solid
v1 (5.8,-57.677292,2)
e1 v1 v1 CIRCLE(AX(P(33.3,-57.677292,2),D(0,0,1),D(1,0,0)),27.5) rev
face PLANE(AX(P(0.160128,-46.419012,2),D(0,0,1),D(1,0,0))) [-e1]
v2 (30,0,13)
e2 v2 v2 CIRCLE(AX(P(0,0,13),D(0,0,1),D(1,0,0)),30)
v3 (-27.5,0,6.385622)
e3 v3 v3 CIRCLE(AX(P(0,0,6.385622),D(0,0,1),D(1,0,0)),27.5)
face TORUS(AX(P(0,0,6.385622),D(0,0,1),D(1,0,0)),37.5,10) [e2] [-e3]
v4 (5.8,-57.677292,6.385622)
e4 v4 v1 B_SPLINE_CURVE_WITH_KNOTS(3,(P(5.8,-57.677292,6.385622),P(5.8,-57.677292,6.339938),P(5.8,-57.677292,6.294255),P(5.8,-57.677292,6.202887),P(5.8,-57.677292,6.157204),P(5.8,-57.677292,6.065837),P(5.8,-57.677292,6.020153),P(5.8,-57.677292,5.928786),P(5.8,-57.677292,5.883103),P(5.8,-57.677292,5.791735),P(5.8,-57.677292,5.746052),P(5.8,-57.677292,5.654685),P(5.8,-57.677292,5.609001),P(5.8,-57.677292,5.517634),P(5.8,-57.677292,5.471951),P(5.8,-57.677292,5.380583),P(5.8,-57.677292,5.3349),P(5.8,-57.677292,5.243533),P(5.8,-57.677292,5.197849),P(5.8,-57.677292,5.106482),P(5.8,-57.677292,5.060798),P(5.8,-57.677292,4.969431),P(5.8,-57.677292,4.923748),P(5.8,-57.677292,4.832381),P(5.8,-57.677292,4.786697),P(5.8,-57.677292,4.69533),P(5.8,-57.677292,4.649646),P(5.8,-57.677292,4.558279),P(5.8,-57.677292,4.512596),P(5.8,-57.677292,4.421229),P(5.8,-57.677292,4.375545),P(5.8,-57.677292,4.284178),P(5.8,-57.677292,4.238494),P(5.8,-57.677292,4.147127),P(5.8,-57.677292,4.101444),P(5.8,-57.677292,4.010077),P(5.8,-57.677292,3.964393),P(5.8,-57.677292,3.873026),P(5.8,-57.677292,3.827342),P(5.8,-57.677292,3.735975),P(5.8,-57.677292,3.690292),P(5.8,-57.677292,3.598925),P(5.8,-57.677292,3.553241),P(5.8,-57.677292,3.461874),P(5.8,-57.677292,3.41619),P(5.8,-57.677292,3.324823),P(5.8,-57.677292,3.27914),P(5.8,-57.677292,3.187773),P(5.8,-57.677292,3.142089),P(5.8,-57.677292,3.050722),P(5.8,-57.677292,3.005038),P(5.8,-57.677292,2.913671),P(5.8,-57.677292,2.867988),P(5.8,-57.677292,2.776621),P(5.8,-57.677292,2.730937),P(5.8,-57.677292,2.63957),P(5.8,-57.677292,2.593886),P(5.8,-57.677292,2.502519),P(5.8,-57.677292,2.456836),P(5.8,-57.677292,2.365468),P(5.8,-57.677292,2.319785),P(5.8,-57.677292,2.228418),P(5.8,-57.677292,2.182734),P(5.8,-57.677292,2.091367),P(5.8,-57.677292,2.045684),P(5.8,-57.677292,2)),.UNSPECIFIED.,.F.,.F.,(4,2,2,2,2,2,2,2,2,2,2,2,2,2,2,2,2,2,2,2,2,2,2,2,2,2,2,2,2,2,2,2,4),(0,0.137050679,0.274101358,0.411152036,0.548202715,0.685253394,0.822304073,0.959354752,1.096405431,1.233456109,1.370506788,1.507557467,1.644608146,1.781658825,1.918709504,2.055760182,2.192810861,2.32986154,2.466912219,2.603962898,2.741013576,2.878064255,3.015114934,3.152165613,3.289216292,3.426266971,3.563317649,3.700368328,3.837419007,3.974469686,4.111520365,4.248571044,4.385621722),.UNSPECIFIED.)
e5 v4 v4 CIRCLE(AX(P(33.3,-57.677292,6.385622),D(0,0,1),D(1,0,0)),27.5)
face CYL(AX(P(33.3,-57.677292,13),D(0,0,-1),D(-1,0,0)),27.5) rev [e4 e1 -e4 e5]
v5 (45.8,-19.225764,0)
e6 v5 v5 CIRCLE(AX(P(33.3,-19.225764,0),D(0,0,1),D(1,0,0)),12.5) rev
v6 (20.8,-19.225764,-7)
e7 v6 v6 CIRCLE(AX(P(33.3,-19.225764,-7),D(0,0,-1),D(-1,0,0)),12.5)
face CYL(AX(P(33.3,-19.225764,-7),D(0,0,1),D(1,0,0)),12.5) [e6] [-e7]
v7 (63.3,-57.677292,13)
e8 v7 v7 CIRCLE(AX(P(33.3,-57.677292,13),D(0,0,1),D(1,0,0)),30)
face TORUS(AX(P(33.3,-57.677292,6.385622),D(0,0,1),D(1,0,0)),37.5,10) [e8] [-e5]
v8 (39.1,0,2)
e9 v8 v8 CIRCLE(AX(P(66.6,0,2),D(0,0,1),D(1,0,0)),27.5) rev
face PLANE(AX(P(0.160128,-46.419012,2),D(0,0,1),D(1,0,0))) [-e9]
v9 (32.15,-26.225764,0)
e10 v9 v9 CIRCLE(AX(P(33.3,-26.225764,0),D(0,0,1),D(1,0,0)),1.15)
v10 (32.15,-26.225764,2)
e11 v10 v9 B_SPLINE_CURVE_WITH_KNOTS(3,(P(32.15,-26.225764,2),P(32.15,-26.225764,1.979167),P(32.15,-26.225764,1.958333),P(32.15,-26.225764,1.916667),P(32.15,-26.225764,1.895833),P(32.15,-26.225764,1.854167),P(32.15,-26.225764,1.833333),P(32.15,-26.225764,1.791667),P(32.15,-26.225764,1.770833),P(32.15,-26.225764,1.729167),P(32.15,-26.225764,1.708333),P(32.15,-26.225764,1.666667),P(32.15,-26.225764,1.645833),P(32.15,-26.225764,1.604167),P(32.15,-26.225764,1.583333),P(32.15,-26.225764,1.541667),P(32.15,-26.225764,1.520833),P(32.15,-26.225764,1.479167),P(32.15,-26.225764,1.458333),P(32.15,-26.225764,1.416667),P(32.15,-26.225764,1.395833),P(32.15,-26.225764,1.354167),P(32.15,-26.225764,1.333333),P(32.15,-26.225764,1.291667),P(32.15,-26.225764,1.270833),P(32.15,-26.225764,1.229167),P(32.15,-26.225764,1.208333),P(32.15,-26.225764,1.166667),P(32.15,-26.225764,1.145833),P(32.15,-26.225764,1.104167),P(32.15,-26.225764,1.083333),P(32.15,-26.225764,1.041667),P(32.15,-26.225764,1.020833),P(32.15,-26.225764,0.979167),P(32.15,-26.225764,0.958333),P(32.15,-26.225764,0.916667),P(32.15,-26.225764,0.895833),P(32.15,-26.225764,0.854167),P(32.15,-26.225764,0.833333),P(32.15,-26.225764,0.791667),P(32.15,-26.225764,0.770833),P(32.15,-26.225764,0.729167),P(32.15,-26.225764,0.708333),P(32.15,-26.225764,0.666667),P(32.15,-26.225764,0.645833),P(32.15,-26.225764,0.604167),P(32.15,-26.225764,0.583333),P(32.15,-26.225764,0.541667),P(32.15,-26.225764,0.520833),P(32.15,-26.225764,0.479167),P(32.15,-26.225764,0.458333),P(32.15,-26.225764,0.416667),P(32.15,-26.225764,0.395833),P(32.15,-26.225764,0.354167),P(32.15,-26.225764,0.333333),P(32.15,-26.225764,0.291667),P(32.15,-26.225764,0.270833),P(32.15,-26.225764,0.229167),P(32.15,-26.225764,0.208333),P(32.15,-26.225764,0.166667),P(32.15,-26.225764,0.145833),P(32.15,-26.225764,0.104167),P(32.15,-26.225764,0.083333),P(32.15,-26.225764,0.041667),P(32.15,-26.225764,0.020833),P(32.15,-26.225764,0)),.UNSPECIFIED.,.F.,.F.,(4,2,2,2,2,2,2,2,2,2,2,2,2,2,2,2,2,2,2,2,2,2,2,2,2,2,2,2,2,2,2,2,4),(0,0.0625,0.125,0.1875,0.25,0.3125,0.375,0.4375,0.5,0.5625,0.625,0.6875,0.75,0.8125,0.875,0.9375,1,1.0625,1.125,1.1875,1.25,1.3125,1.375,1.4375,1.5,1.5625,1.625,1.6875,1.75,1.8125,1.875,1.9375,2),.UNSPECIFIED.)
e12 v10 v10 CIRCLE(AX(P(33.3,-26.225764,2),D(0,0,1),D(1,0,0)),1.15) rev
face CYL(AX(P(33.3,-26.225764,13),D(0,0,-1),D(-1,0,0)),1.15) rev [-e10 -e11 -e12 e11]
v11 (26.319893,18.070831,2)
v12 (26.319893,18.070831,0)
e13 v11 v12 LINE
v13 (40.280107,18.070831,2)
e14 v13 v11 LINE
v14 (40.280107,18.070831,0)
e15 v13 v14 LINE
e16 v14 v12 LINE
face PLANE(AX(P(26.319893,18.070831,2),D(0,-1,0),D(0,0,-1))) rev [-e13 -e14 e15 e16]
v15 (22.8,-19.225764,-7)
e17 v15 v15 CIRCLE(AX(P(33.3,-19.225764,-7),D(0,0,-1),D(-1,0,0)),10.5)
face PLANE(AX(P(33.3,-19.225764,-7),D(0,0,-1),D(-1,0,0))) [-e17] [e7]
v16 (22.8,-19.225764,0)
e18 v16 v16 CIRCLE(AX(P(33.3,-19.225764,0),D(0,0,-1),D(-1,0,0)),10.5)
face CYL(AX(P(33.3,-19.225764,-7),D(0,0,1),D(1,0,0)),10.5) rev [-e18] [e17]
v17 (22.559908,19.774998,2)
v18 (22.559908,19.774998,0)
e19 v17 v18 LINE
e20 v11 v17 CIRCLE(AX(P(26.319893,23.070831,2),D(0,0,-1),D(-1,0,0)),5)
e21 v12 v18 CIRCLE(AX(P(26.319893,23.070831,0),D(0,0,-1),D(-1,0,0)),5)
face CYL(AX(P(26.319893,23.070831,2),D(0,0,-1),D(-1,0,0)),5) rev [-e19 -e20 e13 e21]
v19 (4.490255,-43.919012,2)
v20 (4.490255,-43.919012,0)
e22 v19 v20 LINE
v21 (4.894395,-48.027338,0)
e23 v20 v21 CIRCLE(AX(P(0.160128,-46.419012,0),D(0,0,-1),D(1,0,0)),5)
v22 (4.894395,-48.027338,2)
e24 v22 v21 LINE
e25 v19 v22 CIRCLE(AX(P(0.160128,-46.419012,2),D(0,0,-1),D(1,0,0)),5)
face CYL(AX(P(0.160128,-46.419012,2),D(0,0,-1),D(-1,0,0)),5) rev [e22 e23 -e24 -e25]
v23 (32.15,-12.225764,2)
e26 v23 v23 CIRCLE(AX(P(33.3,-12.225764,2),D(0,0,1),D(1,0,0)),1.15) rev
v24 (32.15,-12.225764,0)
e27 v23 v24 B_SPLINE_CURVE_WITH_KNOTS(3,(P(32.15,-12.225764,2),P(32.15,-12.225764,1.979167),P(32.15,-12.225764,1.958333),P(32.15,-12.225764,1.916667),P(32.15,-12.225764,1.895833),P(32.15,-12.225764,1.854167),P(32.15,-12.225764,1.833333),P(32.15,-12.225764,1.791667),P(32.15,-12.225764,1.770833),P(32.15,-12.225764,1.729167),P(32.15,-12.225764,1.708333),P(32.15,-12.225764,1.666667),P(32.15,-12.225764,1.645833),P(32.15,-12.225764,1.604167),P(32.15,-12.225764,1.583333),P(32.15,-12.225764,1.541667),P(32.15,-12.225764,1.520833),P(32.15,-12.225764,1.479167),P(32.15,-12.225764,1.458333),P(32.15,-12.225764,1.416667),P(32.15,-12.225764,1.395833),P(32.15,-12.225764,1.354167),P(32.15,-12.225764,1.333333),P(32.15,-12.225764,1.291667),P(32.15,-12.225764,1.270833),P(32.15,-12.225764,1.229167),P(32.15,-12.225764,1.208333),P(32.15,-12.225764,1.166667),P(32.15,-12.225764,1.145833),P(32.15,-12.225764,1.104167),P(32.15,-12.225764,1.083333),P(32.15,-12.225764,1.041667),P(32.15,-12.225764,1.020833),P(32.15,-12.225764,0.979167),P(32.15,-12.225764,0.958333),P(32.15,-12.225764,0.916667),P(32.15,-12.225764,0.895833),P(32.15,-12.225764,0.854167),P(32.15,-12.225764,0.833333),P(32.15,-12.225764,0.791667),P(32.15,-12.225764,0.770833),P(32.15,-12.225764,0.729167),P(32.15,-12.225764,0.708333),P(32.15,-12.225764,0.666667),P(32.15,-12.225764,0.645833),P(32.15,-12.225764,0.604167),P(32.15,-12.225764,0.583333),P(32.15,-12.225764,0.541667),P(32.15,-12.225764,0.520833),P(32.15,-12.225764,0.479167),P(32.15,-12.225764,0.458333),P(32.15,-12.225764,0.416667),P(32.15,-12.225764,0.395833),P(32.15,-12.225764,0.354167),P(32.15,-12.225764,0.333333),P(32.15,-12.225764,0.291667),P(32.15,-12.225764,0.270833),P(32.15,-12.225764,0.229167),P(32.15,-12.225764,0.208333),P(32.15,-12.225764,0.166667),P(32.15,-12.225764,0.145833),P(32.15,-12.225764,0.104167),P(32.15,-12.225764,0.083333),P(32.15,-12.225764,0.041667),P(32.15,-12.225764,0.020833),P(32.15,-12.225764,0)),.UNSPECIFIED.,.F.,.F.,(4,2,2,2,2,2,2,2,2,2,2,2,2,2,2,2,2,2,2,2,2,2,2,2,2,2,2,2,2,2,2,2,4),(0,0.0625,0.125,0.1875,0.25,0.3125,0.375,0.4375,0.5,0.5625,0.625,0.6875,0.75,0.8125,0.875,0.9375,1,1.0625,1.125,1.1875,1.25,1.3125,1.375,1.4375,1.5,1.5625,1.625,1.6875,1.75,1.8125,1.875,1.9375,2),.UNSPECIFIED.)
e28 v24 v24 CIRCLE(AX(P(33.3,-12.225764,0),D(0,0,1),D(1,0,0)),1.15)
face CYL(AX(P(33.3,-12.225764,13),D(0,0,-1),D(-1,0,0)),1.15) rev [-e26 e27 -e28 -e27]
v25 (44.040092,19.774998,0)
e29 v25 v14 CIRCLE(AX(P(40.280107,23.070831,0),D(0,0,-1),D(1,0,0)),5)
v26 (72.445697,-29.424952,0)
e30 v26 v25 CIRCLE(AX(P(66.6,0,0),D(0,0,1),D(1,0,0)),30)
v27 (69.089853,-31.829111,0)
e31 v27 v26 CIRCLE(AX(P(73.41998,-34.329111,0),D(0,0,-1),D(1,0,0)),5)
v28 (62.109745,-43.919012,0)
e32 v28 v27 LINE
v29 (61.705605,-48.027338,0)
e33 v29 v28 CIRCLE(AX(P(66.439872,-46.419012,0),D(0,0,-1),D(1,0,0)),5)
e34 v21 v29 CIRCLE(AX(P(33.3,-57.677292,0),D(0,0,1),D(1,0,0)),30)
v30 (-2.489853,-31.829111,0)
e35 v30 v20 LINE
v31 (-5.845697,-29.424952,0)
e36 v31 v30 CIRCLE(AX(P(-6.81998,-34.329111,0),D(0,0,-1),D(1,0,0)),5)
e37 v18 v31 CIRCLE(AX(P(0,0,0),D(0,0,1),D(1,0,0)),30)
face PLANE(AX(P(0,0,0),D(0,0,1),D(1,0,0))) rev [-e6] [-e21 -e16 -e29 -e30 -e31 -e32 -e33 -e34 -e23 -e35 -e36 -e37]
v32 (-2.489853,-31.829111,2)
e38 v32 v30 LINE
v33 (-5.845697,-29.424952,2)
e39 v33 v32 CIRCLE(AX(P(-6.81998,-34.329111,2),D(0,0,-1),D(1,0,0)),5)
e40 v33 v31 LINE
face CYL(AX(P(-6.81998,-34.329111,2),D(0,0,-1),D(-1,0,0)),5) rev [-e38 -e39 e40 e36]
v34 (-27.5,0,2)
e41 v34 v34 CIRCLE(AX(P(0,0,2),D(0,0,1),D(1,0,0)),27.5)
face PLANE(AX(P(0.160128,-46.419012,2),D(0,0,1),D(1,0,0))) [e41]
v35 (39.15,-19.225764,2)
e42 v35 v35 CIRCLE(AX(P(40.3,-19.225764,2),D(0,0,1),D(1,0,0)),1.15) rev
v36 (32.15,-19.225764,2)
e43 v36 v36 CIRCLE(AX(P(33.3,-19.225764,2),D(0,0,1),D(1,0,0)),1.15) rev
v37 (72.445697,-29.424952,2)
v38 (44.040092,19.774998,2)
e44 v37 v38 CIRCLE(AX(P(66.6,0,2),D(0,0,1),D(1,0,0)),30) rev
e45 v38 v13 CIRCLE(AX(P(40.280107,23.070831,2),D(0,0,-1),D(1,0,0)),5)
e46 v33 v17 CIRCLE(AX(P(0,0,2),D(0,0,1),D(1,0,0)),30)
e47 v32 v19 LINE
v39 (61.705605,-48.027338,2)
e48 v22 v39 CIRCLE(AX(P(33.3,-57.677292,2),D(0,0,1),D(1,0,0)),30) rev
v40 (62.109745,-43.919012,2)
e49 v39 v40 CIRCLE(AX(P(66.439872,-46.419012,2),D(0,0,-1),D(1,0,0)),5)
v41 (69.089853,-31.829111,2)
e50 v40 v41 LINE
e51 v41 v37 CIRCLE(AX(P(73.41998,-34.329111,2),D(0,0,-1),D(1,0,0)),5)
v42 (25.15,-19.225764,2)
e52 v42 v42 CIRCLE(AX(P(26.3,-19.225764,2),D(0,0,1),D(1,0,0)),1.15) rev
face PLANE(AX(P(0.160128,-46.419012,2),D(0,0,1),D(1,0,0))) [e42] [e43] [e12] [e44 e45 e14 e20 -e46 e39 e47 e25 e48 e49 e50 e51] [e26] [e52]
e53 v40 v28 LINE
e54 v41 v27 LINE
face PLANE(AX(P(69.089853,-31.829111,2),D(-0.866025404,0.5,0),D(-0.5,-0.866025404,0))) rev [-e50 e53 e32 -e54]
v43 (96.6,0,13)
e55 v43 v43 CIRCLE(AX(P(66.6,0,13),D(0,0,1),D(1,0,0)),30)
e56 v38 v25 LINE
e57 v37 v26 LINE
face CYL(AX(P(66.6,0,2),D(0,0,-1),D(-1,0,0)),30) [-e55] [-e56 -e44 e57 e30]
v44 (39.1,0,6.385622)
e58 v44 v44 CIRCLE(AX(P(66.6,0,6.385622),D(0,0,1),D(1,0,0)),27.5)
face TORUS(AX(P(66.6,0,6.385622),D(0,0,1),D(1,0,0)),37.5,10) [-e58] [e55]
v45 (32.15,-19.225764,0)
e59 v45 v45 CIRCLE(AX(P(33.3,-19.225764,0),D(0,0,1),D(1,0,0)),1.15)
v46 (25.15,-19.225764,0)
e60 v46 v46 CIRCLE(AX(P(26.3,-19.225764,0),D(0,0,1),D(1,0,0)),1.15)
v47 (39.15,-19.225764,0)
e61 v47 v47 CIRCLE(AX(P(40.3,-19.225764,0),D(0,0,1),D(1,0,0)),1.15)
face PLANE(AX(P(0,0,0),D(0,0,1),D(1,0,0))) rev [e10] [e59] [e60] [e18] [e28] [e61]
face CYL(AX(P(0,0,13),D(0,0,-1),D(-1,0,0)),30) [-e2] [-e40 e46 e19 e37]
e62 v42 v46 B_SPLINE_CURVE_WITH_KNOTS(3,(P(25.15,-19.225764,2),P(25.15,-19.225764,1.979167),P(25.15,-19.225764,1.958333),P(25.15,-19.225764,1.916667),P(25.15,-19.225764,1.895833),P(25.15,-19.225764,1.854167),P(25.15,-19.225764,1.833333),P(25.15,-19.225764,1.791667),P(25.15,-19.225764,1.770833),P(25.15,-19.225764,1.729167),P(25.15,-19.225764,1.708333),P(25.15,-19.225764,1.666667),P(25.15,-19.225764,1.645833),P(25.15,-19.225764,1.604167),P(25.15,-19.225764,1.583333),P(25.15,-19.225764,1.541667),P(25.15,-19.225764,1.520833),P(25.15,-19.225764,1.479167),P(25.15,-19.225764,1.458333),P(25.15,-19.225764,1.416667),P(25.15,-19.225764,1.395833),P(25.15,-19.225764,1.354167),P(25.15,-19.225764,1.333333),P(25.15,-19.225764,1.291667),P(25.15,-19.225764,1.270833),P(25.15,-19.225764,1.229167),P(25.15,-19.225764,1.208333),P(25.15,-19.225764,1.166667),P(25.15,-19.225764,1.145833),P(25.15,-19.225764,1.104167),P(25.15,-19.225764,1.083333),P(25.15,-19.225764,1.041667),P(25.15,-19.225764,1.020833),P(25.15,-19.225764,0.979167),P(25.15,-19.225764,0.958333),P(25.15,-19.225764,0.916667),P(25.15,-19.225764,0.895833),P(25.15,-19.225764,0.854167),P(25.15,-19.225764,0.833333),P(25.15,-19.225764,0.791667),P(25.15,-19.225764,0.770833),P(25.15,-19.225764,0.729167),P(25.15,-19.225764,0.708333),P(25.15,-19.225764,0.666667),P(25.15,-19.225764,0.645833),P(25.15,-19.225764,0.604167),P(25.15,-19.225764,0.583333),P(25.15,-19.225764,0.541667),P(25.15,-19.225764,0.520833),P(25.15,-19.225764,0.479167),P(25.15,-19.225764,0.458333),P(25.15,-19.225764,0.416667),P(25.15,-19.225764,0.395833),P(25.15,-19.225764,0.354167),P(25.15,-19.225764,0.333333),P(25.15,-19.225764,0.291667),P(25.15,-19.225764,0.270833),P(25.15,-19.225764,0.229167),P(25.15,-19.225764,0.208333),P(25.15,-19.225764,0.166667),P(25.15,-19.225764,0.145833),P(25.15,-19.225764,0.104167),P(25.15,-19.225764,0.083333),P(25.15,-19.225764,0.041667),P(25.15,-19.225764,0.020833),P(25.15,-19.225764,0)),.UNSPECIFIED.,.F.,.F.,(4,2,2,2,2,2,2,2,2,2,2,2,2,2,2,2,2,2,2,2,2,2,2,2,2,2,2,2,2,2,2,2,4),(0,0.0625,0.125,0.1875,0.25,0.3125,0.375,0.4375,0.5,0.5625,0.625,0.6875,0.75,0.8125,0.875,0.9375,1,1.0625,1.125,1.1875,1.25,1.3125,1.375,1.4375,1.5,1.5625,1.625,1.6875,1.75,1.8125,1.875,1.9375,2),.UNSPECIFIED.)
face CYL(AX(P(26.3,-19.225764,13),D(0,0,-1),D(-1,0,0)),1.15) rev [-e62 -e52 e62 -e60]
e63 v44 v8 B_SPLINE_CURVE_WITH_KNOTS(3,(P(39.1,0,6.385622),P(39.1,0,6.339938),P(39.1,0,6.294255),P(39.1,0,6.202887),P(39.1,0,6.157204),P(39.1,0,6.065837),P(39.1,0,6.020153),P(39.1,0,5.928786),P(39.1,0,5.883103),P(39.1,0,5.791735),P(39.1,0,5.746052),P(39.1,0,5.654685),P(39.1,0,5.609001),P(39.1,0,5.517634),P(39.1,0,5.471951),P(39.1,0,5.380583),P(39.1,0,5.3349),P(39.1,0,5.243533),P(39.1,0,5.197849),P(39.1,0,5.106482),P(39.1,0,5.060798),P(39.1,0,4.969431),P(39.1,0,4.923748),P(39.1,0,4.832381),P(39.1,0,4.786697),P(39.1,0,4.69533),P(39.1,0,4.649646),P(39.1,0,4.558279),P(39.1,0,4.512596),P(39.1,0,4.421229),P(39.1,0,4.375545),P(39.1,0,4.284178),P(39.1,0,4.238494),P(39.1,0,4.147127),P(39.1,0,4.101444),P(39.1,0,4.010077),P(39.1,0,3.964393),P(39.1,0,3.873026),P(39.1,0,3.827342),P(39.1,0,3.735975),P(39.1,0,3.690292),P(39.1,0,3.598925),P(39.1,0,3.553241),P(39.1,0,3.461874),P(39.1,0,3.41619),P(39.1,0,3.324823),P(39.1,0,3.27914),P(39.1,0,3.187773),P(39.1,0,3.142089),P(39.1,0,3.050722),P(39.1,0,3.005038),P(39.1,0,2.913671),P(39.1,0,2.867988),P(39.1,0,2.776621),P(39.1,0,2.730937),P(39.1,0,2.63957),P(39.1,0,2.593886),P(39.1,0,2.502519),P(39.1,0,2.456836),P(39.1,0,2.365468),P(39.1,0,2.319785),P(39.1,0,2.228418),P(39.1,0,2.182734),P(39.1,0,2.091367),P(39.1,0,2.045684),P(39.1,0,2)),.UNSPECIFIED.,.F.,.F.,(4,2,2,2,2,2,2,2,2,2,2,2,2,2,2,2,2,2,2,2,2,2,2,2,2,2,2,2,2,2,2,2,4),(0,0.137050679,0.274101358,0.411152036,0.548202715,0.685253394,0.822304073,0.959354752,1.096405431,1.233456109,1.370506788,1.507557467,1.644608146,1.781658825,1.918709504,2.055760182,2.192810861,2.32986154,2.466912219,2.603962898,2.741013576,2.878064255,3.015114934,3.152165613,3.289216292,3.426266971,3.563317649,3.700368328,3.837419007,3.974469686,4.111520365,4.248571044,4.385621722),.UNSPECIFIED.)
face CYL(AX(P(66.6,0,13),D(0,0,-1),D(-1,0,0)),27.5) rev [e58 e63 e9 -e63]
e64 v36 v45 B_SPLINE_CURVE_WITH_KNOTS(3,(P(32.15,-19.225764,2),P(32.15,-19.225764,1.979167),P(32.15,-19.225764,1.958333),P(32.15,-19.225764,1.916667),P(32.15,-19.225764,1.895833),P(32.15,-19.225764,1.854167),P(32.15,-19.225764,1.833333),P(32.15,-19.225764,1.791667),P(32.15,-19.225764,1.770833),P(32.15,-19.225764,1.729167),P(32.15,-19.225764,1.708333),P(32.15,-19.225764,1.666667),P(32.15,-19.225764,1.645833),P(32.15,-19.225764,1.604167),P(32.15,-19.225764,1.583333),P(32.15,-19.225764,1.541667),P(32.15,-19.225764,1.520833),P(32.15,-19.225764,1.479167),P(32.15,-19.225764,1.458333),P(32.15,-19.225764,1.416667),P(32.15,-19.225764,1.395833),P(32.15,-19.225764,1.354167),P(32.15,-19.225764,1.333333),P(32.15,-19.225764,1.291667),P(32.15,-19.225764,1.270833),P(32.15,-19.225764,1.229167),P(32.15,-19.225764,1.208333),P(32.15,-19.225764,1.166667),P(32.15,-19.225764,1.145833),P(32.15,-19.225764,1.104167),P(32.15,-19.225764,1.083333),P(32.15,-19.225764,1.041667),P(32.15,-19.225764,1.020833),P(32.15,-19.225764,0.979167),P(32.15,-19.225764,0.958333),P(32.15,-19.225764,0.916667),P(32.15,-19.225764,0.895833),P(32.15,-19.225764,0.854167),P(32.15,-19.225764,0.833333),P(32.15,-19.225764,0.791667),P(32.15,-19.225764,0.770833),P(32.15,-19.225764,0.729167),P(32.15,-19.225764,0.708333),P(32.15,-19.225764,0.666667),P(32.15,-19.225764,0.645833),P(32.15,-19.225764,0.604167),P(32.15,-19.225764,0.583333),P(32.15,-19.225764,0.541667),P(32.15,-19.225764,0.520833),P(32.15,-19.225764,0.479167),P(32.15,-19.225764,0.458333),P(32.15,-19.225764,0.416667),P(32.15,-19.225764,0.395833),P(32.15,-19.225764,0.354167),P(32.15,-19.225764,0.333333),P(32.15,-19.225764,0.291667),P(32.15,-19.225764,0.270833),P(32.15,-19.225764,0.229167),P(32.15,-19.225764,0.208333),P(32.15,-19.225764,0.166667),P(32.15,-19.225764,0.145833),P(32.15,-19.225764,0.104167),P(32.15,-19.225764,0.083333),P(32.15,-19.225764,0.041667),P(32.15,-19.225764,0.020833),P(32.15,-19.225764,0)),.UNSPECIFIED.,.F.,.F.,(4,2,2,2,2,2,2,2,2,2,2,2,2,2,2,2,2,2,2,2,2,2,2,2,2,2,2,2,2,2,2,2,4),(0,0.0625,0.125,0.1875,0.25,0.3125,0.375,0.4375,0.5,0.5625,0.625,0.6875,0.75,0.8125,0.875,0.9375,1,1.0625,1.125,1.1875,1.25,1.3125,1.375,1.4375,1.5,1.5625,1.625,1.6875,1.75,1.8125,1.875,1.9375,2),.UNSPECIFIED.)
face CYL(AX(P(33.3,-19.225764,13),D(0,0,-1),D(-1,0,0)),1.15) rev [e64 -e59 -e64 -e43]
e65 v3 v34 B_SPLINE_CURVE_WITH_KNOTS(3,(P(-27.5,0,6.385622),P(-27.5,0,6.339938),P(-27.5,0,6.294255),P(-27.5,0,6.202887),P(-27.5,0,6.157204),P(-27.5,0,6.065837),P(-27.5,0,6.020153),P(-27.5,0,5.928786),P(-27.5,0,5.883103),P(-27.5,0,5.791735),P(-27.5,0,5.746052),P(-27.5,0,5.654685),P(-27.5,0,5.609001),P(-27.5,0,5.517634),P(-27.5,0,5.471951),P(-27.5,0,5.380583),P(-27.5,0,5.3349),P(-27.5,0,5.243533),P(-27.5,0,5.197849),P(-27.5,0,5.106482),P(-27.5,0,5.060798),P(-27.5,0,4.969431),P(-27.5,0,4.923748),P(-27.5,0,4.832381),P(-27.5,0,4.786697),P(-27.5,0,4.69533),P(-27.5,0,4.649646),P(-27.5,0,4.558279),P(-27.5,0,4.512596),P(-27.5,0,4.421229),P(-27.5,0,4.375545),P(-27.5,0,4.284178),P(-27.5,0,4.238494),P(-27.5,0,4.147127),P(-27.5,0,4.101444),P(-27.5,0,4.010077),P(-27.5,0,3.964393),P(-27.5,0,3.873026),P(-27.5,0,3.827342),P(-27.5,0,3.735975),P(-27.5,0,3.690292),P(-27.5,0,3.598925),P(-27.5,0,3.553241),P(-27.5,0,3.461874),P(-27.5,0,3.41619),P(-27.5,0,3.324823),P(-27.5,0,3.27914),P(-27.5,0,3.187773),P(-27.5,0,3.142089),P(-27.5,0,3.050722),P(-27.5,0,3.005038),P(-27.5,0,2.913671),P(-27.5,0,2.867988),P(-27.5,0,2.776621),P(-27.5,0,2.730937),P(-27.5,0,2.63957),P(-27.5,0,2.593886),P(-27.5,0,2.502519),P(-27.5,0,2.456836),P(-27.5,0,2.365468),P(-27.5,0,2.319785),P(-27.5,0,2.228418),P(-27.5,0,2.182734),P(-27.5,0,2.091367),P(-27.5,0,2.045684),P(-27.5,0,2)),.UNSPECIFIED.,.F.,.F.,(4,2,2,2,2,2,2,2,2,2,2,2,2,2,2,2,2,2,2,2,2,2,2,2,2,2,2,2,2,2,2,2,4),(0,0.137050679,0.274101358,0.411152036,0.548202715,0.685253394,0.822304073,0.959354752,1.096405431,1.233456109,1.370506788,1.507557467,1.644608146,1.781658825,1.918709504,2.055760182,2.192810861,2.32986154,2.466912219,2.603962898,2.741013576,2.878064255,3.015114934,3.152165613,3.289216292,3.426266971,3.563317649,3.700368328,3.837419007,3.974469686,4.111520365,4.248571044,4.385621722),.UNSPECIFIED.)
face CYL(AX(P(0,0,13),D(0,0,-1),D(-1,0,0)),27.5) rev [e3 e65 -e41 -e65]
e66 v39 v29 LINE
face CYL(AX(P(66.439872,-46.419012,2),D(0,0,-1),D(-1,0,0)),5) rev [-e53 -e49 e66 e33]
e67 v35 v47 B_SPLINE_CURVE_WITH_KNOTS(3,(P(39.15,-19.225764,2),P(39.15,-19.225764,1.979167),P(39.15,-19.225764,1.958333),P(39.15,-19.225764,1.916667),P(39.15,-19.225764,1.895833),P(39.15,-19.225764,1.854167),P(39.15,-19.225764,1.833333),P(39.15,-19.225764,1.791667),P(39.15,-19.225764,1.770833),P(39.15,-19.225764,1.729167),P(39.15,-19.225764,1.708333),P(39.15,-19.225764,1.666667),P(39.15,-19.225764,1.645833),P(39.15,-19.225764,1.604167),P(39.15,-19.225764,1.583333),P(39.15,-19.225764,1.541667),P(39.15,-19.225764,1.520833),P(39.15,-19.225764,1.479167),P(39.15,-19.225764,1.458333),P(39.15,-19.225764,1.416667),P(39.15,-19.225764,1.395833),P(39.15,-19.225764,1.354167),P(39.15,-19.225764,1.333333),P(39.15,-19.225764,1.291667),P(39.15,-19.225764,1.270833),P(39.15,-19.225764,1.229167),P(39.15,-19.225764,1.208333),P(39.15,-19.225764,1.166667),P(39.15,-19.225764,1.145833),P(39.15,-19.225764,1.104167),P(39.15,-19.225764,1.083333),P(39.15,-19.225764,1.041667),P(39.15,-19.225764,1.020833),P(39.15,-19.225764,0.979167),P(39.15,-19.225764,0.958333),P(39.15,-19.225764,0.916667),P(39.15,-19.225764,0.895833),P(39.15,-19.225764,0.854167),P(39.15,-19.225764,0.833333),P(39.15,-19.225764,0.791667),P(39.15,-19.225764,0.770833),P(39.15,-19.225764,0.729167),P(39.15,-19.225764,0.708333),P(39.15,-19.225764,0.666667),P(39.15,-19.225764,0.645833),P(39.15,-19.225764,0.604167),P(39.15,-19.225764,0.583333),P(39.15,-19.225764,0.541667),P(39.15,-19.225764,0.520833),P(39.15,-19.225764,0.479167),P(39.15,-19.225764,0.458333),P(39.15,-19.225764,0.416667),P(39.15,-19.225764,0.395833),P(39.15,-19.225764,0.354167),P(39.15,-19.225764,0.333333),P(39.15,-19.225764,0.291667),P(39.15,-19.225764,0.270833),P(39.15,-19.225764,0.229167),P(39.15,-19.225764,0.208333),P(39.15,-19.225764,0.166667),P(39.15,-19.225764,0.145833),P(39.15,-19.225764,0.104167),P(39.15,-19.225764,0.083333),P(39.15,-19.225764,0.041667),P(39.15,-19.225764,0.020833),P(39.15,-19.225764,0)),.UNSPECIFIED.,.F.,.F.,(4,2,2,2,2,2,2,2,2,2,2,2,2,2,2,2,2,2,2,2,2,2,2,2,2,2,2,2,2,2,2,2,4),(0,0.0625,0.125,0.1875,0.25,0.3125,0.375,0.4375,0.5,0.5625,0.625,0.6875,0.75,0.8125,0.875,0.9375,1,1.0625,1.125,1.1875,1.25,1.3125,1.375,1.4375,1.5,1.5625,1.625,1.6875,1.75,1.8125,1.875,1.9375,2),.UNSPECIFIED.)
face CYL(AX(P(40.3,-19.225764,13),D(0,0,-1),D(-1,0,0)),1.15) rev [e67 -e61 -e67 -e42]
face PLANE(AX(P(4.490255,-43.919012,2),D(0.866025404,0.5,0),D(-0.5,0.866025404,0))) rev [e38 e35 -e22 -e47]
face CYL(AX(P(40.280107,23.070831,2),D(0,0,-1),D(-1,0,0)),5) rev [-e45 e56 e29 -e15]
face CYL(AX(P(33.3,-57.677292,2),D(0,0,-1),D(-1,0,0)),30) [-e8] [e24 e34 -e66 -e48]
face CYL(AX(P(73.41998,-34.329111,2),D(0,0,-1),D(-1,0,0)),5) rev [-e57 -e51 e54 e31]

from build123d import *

# Parameters (mm, degrees)
SKETCH_1_R          = 30
SKETCH_1_R_2        = 27.5
EXTRUDE_1_DEPTH     = 13
SKETCH_1_R_3        = 29.999999999999996
EXTRUDE_1_2_DEPTH   = 13
EXTRUDE_1_3_DEPTH   = 13
EXTRUDE_2_DEPTH     = 2
SKETCH_3_R          = 1.149999999999996
SKETCH_3_R_2        = 1.1499999999999966
SKETCH_3_R_3        = 1.1500000000000037
CUT_EXTRUDE_5_DEPTH = 132.10250765535577
FILLET_1_R          = 10
SKETCH_5_R          = 12.500000000000002
SKETCH_5_R_2        = 10.5
EXTRUDE_3_DEPTH     = 7


with BuildPart() as part:
    # 草图1 → 凸台-拉伸1 (new body)
    with BuildSketch(Plane.XY):
        with Locations(Location((0, 0, 0), (0, 0, 180))):
            Circle(SKETCH_1_R)
        with Locations(Location((0, 0, 0), (0, 0, 180))):
            Circle(SKETCH_1_R_2, mode=Mode.SUBTRACT)
    extrude(amount=EXTRUDE_1_DEPTH)



with BuildPart() as body_2:
    # 草图1 → Extrude 1 2 (new body)
    with BuildSketch(Plane.XY):
        with Locations(Location((66.6, 0, 0), (0, 0, 180))):
            Circle(SKETCH_1_R_3)
        with Locations(Location((66.6, 0, 0), (0, 0, 180))):
            Circle(SKETCH_1_R_2, mode=Mode.SUBTRACT)
    extrude(amount=EXTRUDE_1_2_DEPTH)


with BuildPart() as body_3:
    # 草图1 → Extrude 1 3 (new body)
    with BuildSketch(Plane.XY):
        with Locations(Location((33.30000000000001, -57.6772918920436, 0), (0, 0, 180))):
            Circle(SKETCH_1_R_3)
        with Locations(Location((33.30000000000001, -57.6772918920436, 0), (0, 0, 180))):
            Circle(SKETCH_1_R_2, mode=Mode.SUBTRACT)
    extrude(amount=EXTRUDE_1_3_DEPTH)


with BuildPart() as part_1:
    add(part.part)

    add(body_2.part)  # 凸台-拉伸2 merges body 2

    add(body_3.part)  # 凸台-拉伸2 merges body 3
    # 草图2 → 凸台-拉伸2 (add)
    with BuildSketch(Plane.XY):
        with BuildLine():
            Line((26.3198925252566, 18.070831312697457), (40.280107474743396, 18.070831312697457))
            ThreePointArc((40.280107474743396, 18.070831312697457), (42.3441853289733, 18.516758123597654), (44.04009212120862, 19.77499826802639))
            ThreePointArc((44.04009212120862, 19.77499826802639), (92.58076211353317, 15), (72.44569692050842, -29.424952464083248))
            ThreePointArc((72.44569692050842, -29.424952464083248), (70.50807559525407, -30.264530756395246), (69.08985272167097, -31.829111208097117))
            Line((69.08985272167097, -31.829111208097117), (62.10974524692759, -43.91901199664395))
            ThreePointArc((62.10974524692759, -43.91901199664395), (61.46389026628078, -45.92951925924603), (61.70560479929982, -48.027337695986766))
            ThreePointArc((61.70560479929982, -48.027337695986766), (33.300000000000004, -87.6772918920436), (4.894395200700185, -48.02733769598677))
            ThreePointArc((4.894395200700185, -48.02733769598677), (5.13610973371921, -45.92951925924604), (4.4902547530724135, -43.91901199664397))
            Line((4.4902547530724135, -43.91901199664397), (-2.489852721670984, -31.829111208097103))
            ThreePointArc((-2.489852721670984, -31.829111208097103), (-3.9080755952540875, -30.264530756395228), (-5.845696920508439, -29.42495246408323))
            ThreePointArc((-5.845696920508439, -29.42495246408323), (-25.980762113533153, 15.000000000000009), (22.55990787879137, 19.77499826802639))
            ThreePointArc((22.55990787879137, 19.77499826802639), (24.25581467102669, 18.516758123597654), (26.3198925252566, 18.070831312697457))
        make_face()
    extrude(amount=EXTRUDE_2_DEPTH)

    # 草图3 → 切除-拉伸5 (cut, through all)
    with BuildSketch(Plane.XY):
        with Locations(Location((33.3, -19.225763964014533, 0), (0, 0, 180))):
            Circle(SKETCH_3_R)
        with Locations(Location((33.3, -12.225763964014533, 0), (0, 0, 180))):
            Circle(SKETCH_3_R_2)
        with Locations(Location((40.3, -19.225763964014533, 0), (0, 0, 180))):
            Circle(SKETCH_3_R)
        with Locations(Location((33.3, -26.22576396401453, 0), (0, 0, 180))):
            Circle(SKETCH_3_R)
        with Locations(Location((26.299999999999997, -19.225763964014533, 0), (0, 0, 180))):
            Circle(SKETCH_3_R_3)
    extrude(amount=CUT_EXTRUDE_5_DEPTH, mode=Mode.SUBTRACT)

    # 圆角1
    # the kernel refuses this fillet: 10 mm, written as the material it takes off along each edge
    with BuildSketch(Plane(origin=(0, 0, 13), x_dir=(-1, 1.2e-16, 0), z_dir=(1.2e-16, 1, 0))) as fillet_1_piece_1:
        with BuildLine():
            CenterArc((37.5, -6.614378277661482), FILLET_1_R, 138.59037789072914, 41.409622109270856)
            Line((27.5, -6.614378277661482), (27.3, -6.614378277661482))
            Line((27.3, -6.614378277661482), (27.3, 0))
            Line((27.3, 0), (27.5, 0.1999999999999993))
            ThreePointArc((27.5, 0.1999999999999993), (28.75, 0.1999999999999993), (29.85, 0.1322875655532254))
            Line((29.85, 0.1322875655532254), (30, -3.55e-15))
        make_face()
    revolve(axis=Axis((0, 0, 13), (0, 0, 1)), mode=Mode.SUBTRACT)
    with BuildSketch(Plane(origin=(66.6, 0, 13), x_dir=(-1, 1.2e-16, 0), z_dir=(1.2e-16, 1, 0))) as fillet_1_piece_2:
        with BuildLine():
            CenterArc((37.5, -6.614378277661482), FILLET_1_R, 138.59037789072914, 41.409622109270856)
            Line((27.5, -6.614378277661482), (27.299999999999997, -6.614378277661482))
            Line((27.299999999999997, -6.614378277661482), (27.299999999999997, 0))
            Line((27.299999999999997, 0), (27.5, 0.1999999999999993))
            ThreePointArc((27.5, 0.1999999999999993), (28.75, 0.1999999999999993), (29.85, 0.1322875655532254))
            Line((29.85, 0.1322875655532254), (30, -3.55e-15))
        make_face()
    revolve(axis=Axis((66.6, 0, 13), (0, 0, 1)), mode=Mode.SUBTRACT)
    with BuildSketch(Plane(origin=(33.30000000000001, -57.6772918920436, 13), x_dir=(-1, 0, 0), z_dir=(0, 1, 0))) as fillet_1_piece_3:
        with BuildLine():
            CenterArc((37.5, -6.614378277661478), FILLET_1_R, 138.59037789072914, 41.409622109270856)
            Line((27.5, -6.614378277661478), (27.3, -6.614378277661478))
            Line((27.3, -6.614378277661478), (27.3, 0))
            Line((27.3, 0), (27.5, 0.1999999999999993))
            ThreePointArc((27.5, 0.1999999999999993), (28.75, 0.1999999999999993), (29.849999999999998, 0.1322875655532254))
            Line((29.849999999999998, 0.1322875655532254), (30, -3.55e-15))
        make_face()
    revolve(axis=Axis((33.30000000000001, -57.6772918920436, 13), (0, 0, 1)), mode=Mode.SUBTRACT)

    # 草图5 → 凸台-拉伸3 (add)
    with BuildSketch(Plane(origin=(0, 0, 0), x_dir=(-1, 0, 0), z_dir=(0, 0, -1))):
        with Locations(Location((-33.3, -19.225763964014533, 0), (0, 0, 180))):
            Circle(SKETCH_5_R)
        with Locations((-33.3, -19.225763964014533)):
            Circle(SKETCH_5_R_2, mode=Mode.SUBTRACT)
    extrude(amount=EXTRUDE_3_DEPTH)


solid = part_1.part
